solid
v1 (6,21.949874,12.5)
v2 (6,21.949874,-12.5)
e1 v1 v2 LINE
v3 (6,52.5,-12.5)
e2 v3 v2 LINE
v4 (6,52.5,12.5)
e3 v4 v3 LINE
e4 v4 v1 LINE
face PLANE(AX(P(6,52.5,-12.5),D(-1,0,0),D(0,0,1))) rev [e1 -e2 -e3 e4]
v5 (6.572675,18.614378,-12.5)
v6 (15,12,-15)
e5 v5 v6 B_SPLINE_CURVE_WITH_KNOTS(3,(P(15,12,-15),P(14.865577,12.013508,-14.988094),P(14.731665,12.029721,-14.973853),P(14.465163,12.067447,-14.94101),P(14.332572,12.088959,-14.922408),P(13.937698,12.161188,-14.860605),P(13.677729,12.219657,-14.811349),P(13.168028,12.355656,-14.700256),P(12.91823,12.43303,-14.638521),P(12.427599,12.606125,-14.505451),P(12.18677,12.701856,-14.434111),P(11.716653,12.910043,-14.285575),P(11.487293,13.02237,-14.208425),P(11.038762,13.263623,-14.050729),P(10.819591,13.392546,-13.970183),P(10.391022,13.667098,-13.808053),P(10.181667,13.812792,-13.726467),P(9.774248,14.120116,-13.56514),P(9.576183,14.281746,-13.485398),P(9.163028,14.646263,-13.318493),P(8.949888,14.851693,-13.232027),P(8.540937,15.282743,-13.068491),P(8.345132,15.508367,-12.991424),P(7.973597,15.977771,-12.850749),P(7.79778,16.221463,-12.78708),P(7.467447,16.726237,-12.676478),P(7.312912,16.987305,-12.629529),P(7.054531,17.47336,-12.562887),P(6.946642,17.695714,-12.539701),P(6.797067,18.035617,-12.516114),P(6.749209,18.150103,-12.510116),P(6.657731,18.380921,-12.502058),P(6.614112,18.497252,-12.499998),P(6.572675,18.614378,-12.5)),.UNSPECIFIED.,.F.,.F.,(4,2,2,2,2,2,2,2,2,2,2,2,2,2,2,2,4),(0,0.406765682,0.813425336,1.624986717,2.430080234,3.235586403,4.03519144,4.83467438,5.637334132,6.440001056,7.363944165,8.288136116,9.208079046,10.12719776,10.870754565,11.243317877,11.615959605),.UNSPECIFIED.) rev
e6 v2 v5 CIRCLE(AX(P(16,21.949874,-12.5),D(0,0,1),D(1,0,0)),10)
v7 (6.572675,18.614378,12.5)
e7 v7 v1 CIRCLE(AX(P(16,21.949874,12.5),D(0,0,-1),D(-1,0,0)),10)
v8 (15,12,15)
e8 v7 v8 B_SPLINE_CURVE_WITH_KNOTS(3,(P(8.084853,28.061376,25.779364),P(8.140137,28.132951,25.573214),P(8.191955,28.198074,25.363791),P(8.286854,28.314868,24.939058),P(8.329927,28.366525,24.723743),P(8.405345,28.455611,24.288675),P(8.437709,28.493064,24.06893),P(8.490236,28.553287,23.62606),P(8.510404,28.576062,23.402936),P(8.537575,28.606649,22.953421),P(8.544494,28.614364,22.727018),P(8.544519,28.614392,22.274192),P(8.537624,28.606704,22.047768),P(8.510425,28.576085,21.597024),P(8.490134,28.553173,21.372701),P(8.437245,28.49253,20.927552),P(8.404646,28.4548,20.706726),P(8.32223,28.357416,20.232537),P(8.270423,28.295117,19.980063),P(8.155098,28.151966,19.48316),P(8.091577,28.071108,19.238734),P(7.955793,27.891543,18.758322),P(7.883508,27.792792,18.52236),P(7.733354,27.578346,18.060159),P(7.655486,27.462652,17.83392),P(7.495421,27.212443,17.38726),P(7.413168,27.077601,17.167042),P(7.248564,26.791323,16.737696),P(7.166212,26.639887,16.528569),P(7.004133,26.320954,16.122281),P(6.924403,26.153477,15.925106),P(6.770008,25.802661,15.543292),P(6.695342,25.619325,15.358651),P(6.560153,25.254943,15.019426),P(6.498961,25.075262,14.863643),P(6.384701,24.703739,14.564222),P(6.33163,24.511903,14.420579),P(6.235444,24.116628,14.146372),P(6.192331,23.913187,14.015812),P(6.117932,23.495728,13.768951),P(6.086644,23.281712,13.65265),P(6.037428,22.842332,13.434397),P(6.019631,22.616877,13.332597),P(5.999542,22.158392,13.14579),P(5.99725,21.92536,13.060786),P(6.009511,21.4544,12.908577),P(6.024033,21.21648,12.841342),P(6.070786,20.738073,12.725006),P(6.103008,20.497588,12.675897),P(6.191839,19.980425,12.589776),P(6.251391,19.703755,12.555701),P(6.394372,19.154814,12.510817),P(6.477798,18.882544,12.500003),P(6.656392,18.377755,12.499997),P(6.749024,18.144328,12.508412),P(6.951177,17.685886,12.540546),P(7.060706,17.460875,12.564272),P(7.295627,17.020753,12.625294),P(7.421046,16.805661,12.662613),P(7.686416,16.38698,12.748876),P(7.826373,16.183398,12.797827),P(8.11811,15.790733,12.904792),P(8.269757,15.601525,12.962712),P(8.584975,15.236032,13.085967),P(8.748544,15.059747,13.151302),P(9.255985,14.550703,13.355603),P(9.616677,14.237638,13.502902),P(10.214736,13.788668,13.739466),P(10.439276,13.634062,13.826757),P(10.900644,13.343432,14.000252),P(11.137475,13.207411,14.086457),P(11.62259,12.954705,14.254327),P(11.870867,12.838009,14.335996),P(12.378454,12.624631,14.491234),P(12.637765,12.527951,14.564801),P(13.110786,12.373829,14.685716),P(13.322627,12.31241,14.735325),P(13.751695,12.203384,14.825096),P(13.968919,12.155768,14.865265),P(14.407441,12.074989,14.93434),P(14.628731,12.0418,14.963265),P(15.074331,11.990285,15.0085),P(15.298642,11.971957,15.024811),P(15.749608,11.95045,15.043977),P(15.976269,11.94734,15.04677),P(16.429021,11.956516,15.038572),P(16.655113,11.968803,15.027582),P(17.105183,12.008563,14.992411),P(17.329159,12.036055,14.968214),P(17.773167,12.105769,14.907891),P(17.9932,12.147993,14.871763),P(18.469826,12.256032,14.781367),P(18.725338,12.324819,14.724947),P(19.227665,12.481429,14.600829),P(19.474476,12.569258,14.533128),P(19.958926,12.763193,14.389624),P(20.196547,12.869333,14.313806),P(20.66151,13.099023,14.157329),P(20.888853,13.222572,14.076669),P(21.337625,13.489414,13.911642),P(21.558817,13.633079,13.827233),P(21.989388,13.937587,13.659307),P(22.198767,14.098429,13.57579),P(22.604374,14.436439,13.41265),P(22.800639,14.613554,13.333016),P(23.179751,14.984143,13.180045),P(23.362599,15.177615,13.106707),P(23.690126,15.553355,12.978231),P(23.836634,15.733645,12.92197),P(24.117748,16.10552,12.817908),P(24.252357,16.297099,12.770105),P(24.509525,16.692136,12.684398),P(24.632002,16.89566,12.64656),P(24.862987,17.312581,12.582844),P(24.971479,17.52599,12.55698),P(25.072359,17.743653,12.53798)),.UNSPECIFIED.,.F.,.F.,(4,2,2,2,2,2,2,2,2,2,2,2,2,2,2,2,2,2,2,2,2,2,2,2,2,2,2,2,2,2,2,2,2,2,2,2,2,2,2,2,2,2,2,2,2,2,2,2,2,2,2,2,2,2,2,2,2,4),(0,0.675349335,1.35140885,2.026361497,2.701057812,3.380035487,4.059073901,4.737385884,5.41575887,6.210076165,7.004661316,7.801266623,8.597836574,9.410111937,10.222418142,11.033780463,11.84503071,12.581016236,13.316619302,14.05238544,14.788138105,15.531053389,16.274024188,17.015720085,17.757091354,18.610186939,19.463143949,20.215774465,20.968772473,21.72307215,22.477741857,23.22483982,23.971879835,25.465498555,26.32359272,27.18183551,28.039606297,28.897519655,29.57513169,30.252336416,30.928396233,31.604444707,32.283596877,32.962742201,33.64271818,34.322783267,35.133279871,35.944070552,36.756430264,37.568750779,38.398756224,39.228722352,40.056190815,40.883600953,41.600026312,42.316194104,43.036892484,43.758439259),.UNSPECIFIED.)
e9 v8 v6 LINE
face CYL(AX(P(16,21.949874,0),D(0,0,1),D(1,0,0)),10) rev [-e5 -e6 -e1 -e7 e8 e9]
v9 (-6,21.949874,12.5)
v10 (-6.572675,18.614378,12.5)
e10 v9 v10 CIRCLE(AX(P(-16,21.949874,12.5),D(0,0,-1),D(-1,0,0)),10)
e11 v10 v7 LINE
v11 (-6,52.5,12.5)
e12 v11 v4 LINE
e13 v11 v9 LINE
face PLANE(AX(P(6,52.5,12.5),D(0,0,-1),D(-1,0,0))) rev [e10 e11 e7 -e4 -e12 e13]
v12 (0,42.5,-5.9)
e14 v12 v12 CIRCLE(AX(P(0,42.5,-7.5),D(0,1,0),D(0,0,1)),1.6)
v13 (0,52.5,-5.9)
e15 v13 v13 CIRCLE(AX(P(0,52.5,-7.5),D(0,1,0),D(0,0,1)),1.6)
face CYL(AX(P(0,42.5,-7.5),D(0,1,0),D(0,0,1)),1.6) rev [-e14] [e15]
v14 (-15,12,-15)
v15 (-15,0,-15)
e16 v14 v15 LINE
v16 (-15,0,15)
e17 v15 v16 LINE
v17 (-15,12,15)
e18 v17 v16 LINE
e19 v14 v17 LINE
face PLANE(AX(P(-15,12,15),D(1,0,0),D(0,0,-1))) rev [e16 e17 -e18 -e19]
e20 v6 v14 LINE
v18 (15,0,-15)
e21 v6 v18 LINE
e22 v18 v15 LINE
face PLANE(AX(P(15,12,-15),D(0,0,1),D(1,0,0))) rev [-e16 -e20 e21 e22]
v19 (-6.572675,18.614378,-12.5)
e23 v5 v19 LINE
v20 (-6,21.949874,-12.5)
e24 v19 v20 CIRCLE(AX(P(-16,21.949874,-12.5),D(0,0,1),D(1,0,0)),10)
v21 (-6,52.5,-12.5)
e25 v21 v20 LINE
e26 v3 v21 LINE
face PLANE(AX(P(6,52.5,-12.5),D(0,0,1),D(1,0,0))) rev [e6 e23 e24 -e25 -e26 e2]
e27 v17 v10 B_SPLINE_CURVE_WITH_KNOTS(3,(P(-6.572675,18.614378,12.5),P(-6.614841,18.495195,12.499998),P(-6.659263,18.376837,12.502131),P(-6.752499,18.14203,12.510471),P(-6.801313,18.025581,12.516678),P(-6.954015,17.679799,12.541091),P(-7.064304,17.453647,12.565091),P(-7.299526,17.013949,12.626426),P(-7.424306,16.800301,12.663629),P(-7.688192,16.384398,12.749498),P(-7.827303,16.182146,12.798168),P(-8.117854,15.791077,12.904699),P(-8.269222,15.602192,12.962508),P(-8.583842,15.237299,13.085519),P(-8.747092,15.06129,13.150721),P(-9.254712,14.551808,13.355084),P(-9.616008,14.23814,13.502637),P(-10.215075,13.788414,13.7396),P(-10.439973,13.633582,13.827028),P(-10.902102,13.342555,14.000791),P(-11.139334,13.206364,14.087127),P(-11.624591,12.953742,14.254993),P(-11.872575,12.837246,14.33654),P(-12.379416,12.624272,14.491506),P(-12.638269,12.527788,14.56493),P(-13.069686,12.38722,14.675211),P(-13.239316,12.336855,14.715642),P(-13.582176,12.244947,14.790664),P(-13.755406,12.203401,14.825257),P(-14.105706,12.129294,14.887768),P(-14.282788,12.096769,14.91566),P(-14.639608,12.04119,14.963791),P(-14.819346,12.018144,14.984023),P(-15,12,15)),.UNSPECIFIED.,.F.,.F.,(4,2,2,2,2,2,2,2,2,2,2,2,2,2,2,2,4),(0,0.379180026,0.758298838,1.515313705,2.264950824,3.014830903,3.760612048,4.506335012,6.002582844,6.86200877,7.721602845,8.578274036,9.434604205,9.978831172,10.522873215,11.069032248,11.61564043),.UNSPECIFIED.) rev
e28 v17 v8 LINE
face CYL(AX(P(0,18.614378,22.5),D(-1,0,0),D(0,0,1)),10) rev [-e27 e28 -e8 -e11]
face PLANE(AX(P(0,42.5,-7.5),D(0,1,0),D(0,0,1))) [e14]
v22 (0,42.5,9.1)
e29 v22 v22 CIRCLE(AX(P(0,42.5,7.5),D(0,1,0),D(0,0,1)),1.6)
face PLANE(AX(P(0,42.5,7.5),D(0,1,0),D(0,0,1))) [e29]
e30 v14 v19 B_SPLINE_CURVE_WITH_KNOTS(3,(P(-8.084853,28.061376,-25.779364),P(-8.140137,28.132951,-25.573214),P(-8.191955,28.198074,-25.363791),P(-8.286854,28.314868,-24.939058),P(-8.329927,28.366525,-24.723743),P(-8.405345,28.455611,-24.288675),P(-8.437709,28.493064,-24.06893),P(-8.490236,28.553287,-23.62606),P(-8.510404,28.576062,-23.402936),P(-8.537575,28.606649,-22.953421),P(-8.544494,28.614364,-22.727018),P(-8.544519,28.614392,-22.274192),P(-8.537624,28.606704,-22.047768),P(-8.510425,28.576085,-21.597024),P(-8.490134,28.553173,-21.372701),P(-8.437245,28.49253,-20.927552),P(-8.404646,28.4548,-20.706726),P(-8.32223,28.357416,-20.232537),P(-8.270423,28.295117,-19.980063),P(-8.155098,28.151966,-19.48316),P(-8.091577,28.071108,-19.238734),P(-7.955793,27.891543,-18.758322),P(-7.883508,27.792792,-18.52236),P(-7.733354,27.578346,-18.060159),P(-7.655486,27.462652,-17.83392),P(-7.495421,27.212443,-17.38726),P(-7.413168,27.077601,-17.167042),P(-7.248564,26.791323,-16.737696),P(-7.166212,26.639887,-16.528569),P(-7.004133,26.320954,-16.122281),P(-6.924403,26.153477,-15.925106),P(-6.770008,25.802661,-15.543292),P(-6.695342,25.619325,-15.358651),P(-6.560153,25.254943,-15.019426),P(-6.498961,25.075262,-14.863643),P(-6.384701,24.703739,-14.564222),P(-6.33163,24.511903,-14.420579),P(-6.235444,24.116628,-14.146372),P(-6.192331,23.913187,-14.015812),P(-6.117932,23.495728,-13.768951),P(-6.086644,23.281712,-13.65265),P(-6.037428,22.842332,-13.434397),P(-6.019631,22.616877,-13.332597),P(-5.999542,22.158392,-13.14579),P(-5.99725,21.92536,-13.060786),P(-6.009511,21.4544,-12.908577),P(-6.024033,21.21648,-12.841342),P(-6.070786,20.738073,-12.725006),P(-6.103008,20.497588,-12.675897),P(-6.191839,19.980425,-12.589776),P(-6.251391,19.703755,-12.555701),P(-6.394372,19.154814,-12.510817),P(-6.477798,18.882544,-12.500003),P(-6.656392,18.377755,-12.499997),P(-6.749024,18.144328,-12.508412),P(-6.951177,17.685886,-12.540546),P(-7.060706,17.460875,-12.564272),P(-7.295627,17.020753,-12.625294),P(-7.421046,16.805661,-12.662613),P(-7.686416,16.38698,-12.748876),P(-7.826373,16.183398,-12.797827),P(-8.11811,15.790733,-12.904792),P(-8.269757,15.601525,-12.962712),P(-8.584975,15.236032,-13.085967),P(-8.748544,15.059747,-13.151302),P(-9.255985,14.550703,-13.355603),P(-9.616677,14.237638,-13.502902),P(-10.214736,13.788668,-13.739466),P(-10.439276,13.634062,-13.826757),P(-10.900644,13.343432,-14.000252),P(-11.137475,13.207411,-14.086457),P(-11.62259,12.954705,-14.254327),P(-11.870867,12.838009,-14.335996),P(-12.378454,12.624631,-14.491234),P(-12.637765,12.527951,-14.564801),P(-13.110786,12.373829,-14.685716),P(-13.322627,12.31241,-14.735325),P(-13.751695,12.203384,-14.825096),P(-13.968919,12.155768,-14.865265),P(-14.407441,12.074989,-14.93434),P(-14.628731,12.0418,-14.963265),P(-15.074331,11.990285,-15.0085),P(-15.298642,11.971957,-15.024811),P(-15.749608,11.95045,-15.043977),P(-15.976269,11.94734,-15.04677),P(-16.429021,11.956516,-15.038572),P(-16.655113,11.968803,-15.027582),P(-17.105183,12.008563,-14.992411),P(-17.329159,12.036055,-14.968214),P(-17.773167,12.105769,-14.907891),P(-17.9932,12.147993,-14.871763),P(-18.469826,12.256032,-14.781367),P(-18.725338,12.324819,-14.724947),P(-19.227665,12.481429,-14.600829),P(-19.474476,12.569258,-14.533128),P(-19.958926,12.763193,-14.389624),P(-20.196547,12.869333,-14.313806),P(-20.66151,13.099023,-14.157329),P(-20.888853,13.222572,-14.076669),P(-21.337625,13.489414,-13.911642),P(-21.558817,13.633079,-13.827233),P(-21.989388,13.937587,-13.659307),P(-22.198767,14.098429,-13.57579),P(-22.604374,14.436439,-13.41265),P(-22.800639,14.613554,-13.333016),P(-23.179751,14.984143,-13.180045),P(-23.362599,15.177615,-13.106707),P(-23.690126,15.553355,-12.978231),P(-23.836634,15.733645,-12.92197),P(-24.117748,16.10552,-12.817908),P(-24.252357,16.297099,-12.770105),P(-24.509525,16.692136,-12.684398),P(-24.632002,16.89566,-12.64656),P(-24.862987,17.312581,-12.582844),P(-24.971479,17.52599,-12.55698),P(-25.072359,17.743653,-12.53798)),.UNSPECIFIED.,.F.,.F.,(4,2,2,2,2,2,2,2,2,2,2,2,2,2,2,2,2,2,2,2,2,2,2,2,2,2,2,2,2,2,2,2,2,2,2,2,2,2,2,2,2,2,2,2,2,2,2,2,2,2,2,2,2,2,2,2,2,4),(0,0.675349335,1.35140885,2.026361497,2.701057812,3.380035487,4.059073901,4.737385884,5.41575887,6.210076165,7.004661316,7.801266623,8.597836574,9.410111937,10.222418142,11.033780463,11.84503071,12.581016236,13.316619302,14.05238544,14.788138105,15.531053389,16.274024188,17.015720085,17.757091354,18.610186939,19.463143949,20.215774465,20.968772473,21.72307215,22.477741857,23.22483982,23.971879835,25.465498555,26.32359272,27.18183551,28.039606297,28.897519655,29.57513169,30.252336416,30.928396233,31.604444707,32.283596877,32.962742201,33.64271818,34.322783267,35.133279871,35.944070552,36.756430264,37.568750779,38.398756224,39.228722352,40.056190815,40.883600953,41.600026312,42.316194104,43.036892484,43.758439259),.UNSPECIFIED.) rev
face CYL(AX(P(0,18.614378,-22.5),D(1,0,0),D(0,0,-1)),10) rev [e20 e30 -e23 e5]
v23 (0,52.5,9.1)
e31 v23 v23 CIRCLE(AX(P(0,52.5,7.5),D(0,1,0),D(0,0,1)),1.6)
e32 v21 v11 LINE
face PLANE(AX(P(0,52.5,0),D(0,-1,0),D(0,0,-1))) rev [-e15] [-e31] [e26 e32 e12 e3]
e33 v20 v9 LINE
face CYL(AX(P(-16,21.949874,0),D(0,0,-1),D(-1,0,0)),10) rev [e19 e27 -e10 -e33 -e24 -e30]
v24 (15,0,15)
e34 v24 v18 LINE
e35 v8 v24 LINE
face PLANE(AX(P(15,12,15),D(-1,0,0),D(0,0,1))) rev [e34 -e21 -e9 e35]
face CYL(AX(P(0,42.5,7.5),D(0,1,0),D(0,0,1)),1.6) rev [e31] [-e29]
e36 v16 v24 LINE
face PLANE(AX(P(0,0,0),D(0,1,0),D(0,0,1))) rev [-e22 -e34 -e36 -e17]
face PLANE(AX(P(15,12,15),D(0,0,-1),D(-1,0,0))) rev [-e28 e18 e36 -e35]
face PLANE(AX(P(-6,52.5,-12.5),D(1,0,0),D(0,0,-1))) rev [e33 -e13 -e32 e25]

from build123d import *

# Parameters (mm, degrees)
SKETCH1_W           = 30
SKETCH1_H           = 30
BOSS_EXTRUDE1_DEPTH = 12
SKETCH2_W           = 12
SKETCH2_H           = 25
BOSS_EXTRUDE2_DEPTH = 40.5
SKETCH3_R           = 1.6
CUT_EXTRUDE1_DEPTH  = 10
FILLET1_R           = 10


with BuildPart() as part:
    # Sketch1 → Boss-Extrude1 (new body)
    with BuildSketch(Plane(origin=(0, 0, 0), x_dir=(1, 0, 0), z_dir=(0, 1, 0))):
        Rectangle(SKETCH1_W, SKETCH1_H)
    extrude(amount=BOSS_EXTRUDE1_DEPTH)

    # Sketch2 → Boss-Extrude2 (add)
    with BuildSketch(Plane(origin=(0, 12, 0), x_dir=(1, 0, 0), z_dir=(0, 1, 0))):
        Rectangle(SKETCH2_W, SKETCH2_H)
    extrude(amount=BOSS_EXTRUDE2_DEPTH)

    # Sketch3 → Cut-Extrude1 (cut)
    with BuildSketch(Plane(origin=(0, 52.5, 0), x_dir=(1, 0, 0), z_dir=(0, 1, 0))):
        with Locations(Location((0, -7.5, 0), (0, 0, 270))):
            Circle(SKETCH3_R)
        with Locations(Location((0, 7.5, 0), (0, 0, 270))):
            Circle(SKETCH3_R)
    extrude(amount=-CUT_EXTRUDE1_DEPTH, mode=Mode.SUBTRACT)

    # Fillet1
    # the kernel refuses this fillet: 10 mm, written as the material it adds along each edge
    with BuildSketch(Plane(origin=(6, 12, 12.5), x_dir=(1, 0, 0), z_dir=(0, 0, -1)), Plane(origin=(-6, 12, -12.5), x_dir=(-1, 0, 0), z_dir=(0, 0, 1))) as fillet1_piece_1:
        with BuildLine():
            CenterArc((10, -9.949874371), FILLET1_R, 95.739170477, 84.260829523)
            Line((0, -9.949874371), (-0.2, -9.949874371))
            Line((-0.2, -9.949874371), (-0.2, 0))
            Line((-0.2, 0), (0, 0.2))
            ThreePointArc((0, 0.2), (4.5, 0.2), (8.98, 0.198997487))
            Line((8.98, 0.198997487), (9, 0))
        make_face()
    extrude(amount=25)
    with BuildSketch(Plane(origin=(6, 12, -12.5), x_dir=(0, 0, -1), z_dir=(-1, 0, 0)), Plane(origin=(-6, 12, 12.5), x_dir=(0, 0, 1), z_dir=(1, 0, 0))) as fillet1_piece_2:
        with BuildLine():
            CenterArc((10, -6.614378278), FILLET1_R, 138.590377891, 41.409622109)
            Line((0, -6.614378278), (-0.2, -6.614378278))
            Line((-0.2, -6.614378278), (-0.2, 0))
            Line((-0.2, 0), (0, 0.2))
            ThreePointArc((0, 0.2), (1.25, 0.2), (2.35, 0.132287566))
            Line((2.35, 0.132287566), (2.5, 0))
        make_face()
    extrude(amount=12)
    with BuildSketch(Plane(origin=(6, 12, 37.374685928), x_dir=(1, 0, 0), z_dir=(0, 0, -1))) as fillet1_piece_3a_section:
        with BuildLine():
            CenterArc((10, -9.949874371), FILLET1_R, 95.739170477, 84.260829523)
            Line((0, -9.949874371), (-0.2, -9.949874371))
            Line((-0.2, -9.949874371), (-0.2, 0))
            Line((-0.2, 0), (0, 0.2))
            ThreePointArc((0, 0.2), (4.5, 0.2), (8.98, 0.198997487))
            Line((8.98, 0.198997487), (9, 0))
        make_face()
    fillet1_piece_3a = extrude(amount=49.874685928, mode=Mode.PRIVATE)
    fillet1_piece_3a = split(fillet1_piece_3a, bisect_by=Plane(origin=(8.162151556, 14.281986067, 15), z_dir=(0, 0, -1)), keep=Keep.TOP, mode=Mode.PRIVATE)
    fillet1_piece_3a = split(fillet1_piece_3a, bisect_by=Plane(origin=(8.162151556, 14.281986067, 12.5), z_dir=(0, 0, 1)), keep=Keep.TOP, mode=Mode.PRIVATE)
    with BuildSketch(Plane(origin=(-6, 12, 12.5), x_dir=(0, 0, 1), z_dir=(1, 0, 0))) as fillet1_piece_3b_section:
        with BuildLine():
            CenterArc((10, -6.614378278), FILLET1_R, 138.590377891, 41.409622109)
            Line((0, -6.614378278), (-0.2, -6.614378278))
            Line((-0.2, -6.614378278), (-0.2, 0))
            Line((-0.2, 0), (0, 0.2))
            ThreePointArc((0, 0.2), (1.25, 0.2), (2.35, 0.132287566))
            Line((2.35, 0.132287566), (2.5, 0))
        make_face()
    fillet1_piece_3b = extrude(amount=28.535945694, mode=Mode.PRIVATE)
    fillet1_piece_3b = split(fillet1_piece_3b, bisect_by=Plane(origin=(15, 13.814075663, 13.097749904), z_dir=(-1, 0, 0)), keep=Keep.TOP, mode=Mode.PRIVATE)
    fillet1_piece_3b = split(fillet1_piece_3b, bisect_by=Plane(origin=(6, 13.814075663, 13.097749904), z_dir=(1, 0, 0)), keep=Keep.TOP, mode=Mode.PRIVATE)
    fillet1_piece_3 = fillet1_piece_3a & fillet1_piece_3b
    add(fillet1_piece_3)
    with BuildSketch(Plane(origin=(6, 12, 12.5), x_dir=(1, 0, 0), z_dir=(0, 0, -1))) as fillet1_piece_4a_section:
        with BuildLine():
            CenterArc((10, -9.949874371), FILLET1_R, 95.739170477, 84.260829523)
            Line((0, -9.949874371), (-0.2, -9.949874371))
            Line((-0.2, -9.949874371), (-0.2, 0))
            Line((-0.2, 0), (0, 0.2))
            ThreePointArc((0, 0.2), (4.5, 0.2), (8.98, 0.198997487))
            Line((8.98, 0.198997487), (9, 0))
        make_face()
    fillet1_piece_4a = extrude(amount=49.874685928, mode=Mode.PRIVATE)
    fillet1_piece_4a = split(fillet1_piece_4a, bisect_by=Plane(origin=(8.162151556, 14.281986067, -15), z_dir=(0, 0, 1)), keep=Keep.TOP, mode=Mode.PRIVATE)
    fillet1_piece_4a = split(fillet1_piece_4a, bisect_by=Plane(origin=(8.162151556, 14.281986067, -12.5), z_dir=(0, 0, -1)), keep=Keep.TOP, mode=Mode.PRIVATE)
    with BuildSketch(Plane(origin=(22.535945694, 12, -12.5), x_dir=(0, 0, -1), z_dir=(-1, 0, 0))) as fillet1_piece_4b_section:
        with BuildLine():
            CenterArc((10, -6.614378278), FILLET1_R, 138.590377891, 41.409622109)
            Line((0, -6.614378278), (-0.2, -6.614378278))
            Line((-0.2, -6.614378278), (-0.2, 0))
            Line((-0.2, 0), (0, 0.2))
            ThreePointArc((0, 0.2), (1.25, 0.2), (2.35, 0.132287566))
            Line((2.35, 0.132287566), (2.5, 0))
        make_face()
    fillet1_piece_4b = extrude(amount=28.535945694, mode=Mode.PRIVATE)
    fillet1_piece_4b = split(fillet1_piece_4b, bisect_by=Plane(origin=(15, 13.814075663, -13.097749904), z_dir=(-1, 0, 0)), keep=Keep.TOP, mode=Mode.PRIVATE)
    fillet1_piece_4b = split(fillet1_piece_4b, bisect_by=Plane(origin=(6, 13.814075663, -13.097749904), z_dir=(1, 0, 0)), keep=Keep.TOP, mode=Mode.PRIVATE)
    fillet1_piece_4 = fillet1_piece_4a & fillet1_piece_4b
    add(fillet1_piece_4)
    with BuildSketch(Plane(origin=(-6, 12, -37.374685928), x_dir=(-1, 0, 0), z_dir=(0, 0, 1))) as fillet1_piece_5a_section:
        with BuildLine():
            CenterArc((10, -9.949874371), FILLET1_R, 95.739170477, 84.260829523)
            Line((0, -9.949874371), (-0.2, -9.949874371))
            Line((-0.2, -9.949874371), (-0.2, 0))
            Line((-0.2, 0), (0, 0.2))
            ThreePointArc((0, 0.2), (4.5, 0.2), (8.98, 0.198997487))
            Line((8.98, 0.198997487), (9, 0))
        make_face()
    fillet1_piece_5a = extrude(amount=49.874685928, mode=Mode.PRIVATE)
    fillet1_piece_5a = split(fillet1_piece_5a, bisect_by=Plane(origin=(-8.162151556, 14.281986067, -15), z_dir=(0, 0, 1)), keep=Keep.TOP, mode=Mode.PRIVATE)
    fillet1_piece_5a = split(fillet1_piece_5a, bisect_by=Plane(origin=(-8.162151556, 14.281986067, -12.5), z_dir=(0, 0, -1)), keep=Keep.TOP, mode=Mode.PRIVATE)
    with BuildSketch(Plane(origin=(6, 12, -12.5), x_dir=(0, 0, -1), z_dir=(-1, 0, 0))) as fillet1_piece_5b_section:
        with BuildLine():
            CenterArc((10, -6.614378278), FILLET1_R, 138.590377891, 41.409622109)
            Line((0, -6.614378278), (-0.2, -6.614378278))
            Line((-0.2, -6.614378278), (-0.2, 0))
            Line((-0.2, 0), (0, 0.2))
            ThreePointArc((0, 0.2), (1.25, 0.2), (2.35, 0.132287566))
            Line((2.35, 0.132287566), (2.5, 0))
        make_face()
    fillet1_piece_5b = extrude(amount=28.535945694, mode=Mode.PRIVATE)
    fillet1_piece_5b = split(fillet1_piece_5b, bisect_by=Plane(origin=(-15, 13.814075663, -13.097749904), z_dir=(1, 0, 0)), keep=Keep.TOP, mode=Mode.PRIVATE)
    fillet1_piece_5b = split(fillet1_piece_5b, bisect_by=Plane(origin=(-6, 13.814075663, -13.097749904), z_dir=(-1, 0, 0)), keep=Keep.TOP, mode=Mode.PRIVATE)
    fillet1_piece_5 = fillet1_piece_5a & fillet1_piece_5b
    add(fillet1_piece_5)
    with BuildSketch(Plane(origin=(-22.535945694, 12, 12.5), x_dir=(0, 0, 1), z_dir=(1, 0, 0))) as fillet1_piece_6a_section:
        with BuildLine():
            CenterArc((10, -6.614378278), FILLET1_R, 138.590377891, 41.409622109)
            Line((0, -6.614378278), (-0.2, -6.614378278))
            Line((-0.2, -6.614378278), (-0.2, 0))
            Line((-0.2, 0), (0, 0.2))
            ThreePointArc((0, 0.2), (1.25, 0.2), (2.35, 0.132287566))
            Line((2.35, 0.132287566), (2.5, 0))
        make_face()
    fillet1_piece_6a = extrude(amount=28.535945694, mode=Mode.PRIVATE)
    fillet1_piece_6a = split(fillet1_piece_6a, bisect_by=Plane(origin=(-15, 13.814075663, 13.097749904), z_dir=(1, 0, 0)), keep=Keep.TOP, mode=Mode.PRIVATE)
    fillet1_piece_6a = split(fillet1_piece_6a, bisect_by=Plane(origin=(-6, 13.814075663, 13.097749904), z_dir=(-1, 0, 0)), keep=Keep.TOP, mode=Mode.PRIVATE)
    with BuildSketch(Plane(origin=(-6, 12, -12.5), x_dir=(-1, 0, 0), z_dir=(0, 0, 1))) as fillet1_piece_6b_section:
        with BuildLine():
            CenterArc((10, -9.949874371), FILLET1_R, 95.739170477, 84.260829523)
            Line((0, -9.949874371), (-0.2, -9.949874371))
            Line((-0.2, -9.949874371), (-0.2, 0))
            Line((-0.2, 0), (0, 0.2))
            ThreePointArc((0, 0.2), (4.5, 0.2), (8.98, 0.198997487))
            Line((8.98, 0.198997487), (9, 0))
        make_face()
    fillet1_piece_6b = extrude(amount=49.874685928, mode=Mode.PRIVATE)
    fillet1_piece_6b = split(fillet1_piece_6b, bisect_by=Plane(origin=(-8.162151556, 14.281986067, 15), z_dir=(0, 0, -1)), keep=Keep.TOP, mode=Mode.PRIVATE)
    fillet1_piece_6b = split(fillet1_piece_6b, bisect_by=Plane(origin=(-8.162151556, 14.281986067, 12.5), z_dir=(0, 0, 1)), keep=Keep.TOP, mode=Mode.PRIVATE)
    fillet1_piece_6 = fillet1_piece_6a & fillet1_piece_6b
    add(fillet1_piece_6)


solid = part.part
